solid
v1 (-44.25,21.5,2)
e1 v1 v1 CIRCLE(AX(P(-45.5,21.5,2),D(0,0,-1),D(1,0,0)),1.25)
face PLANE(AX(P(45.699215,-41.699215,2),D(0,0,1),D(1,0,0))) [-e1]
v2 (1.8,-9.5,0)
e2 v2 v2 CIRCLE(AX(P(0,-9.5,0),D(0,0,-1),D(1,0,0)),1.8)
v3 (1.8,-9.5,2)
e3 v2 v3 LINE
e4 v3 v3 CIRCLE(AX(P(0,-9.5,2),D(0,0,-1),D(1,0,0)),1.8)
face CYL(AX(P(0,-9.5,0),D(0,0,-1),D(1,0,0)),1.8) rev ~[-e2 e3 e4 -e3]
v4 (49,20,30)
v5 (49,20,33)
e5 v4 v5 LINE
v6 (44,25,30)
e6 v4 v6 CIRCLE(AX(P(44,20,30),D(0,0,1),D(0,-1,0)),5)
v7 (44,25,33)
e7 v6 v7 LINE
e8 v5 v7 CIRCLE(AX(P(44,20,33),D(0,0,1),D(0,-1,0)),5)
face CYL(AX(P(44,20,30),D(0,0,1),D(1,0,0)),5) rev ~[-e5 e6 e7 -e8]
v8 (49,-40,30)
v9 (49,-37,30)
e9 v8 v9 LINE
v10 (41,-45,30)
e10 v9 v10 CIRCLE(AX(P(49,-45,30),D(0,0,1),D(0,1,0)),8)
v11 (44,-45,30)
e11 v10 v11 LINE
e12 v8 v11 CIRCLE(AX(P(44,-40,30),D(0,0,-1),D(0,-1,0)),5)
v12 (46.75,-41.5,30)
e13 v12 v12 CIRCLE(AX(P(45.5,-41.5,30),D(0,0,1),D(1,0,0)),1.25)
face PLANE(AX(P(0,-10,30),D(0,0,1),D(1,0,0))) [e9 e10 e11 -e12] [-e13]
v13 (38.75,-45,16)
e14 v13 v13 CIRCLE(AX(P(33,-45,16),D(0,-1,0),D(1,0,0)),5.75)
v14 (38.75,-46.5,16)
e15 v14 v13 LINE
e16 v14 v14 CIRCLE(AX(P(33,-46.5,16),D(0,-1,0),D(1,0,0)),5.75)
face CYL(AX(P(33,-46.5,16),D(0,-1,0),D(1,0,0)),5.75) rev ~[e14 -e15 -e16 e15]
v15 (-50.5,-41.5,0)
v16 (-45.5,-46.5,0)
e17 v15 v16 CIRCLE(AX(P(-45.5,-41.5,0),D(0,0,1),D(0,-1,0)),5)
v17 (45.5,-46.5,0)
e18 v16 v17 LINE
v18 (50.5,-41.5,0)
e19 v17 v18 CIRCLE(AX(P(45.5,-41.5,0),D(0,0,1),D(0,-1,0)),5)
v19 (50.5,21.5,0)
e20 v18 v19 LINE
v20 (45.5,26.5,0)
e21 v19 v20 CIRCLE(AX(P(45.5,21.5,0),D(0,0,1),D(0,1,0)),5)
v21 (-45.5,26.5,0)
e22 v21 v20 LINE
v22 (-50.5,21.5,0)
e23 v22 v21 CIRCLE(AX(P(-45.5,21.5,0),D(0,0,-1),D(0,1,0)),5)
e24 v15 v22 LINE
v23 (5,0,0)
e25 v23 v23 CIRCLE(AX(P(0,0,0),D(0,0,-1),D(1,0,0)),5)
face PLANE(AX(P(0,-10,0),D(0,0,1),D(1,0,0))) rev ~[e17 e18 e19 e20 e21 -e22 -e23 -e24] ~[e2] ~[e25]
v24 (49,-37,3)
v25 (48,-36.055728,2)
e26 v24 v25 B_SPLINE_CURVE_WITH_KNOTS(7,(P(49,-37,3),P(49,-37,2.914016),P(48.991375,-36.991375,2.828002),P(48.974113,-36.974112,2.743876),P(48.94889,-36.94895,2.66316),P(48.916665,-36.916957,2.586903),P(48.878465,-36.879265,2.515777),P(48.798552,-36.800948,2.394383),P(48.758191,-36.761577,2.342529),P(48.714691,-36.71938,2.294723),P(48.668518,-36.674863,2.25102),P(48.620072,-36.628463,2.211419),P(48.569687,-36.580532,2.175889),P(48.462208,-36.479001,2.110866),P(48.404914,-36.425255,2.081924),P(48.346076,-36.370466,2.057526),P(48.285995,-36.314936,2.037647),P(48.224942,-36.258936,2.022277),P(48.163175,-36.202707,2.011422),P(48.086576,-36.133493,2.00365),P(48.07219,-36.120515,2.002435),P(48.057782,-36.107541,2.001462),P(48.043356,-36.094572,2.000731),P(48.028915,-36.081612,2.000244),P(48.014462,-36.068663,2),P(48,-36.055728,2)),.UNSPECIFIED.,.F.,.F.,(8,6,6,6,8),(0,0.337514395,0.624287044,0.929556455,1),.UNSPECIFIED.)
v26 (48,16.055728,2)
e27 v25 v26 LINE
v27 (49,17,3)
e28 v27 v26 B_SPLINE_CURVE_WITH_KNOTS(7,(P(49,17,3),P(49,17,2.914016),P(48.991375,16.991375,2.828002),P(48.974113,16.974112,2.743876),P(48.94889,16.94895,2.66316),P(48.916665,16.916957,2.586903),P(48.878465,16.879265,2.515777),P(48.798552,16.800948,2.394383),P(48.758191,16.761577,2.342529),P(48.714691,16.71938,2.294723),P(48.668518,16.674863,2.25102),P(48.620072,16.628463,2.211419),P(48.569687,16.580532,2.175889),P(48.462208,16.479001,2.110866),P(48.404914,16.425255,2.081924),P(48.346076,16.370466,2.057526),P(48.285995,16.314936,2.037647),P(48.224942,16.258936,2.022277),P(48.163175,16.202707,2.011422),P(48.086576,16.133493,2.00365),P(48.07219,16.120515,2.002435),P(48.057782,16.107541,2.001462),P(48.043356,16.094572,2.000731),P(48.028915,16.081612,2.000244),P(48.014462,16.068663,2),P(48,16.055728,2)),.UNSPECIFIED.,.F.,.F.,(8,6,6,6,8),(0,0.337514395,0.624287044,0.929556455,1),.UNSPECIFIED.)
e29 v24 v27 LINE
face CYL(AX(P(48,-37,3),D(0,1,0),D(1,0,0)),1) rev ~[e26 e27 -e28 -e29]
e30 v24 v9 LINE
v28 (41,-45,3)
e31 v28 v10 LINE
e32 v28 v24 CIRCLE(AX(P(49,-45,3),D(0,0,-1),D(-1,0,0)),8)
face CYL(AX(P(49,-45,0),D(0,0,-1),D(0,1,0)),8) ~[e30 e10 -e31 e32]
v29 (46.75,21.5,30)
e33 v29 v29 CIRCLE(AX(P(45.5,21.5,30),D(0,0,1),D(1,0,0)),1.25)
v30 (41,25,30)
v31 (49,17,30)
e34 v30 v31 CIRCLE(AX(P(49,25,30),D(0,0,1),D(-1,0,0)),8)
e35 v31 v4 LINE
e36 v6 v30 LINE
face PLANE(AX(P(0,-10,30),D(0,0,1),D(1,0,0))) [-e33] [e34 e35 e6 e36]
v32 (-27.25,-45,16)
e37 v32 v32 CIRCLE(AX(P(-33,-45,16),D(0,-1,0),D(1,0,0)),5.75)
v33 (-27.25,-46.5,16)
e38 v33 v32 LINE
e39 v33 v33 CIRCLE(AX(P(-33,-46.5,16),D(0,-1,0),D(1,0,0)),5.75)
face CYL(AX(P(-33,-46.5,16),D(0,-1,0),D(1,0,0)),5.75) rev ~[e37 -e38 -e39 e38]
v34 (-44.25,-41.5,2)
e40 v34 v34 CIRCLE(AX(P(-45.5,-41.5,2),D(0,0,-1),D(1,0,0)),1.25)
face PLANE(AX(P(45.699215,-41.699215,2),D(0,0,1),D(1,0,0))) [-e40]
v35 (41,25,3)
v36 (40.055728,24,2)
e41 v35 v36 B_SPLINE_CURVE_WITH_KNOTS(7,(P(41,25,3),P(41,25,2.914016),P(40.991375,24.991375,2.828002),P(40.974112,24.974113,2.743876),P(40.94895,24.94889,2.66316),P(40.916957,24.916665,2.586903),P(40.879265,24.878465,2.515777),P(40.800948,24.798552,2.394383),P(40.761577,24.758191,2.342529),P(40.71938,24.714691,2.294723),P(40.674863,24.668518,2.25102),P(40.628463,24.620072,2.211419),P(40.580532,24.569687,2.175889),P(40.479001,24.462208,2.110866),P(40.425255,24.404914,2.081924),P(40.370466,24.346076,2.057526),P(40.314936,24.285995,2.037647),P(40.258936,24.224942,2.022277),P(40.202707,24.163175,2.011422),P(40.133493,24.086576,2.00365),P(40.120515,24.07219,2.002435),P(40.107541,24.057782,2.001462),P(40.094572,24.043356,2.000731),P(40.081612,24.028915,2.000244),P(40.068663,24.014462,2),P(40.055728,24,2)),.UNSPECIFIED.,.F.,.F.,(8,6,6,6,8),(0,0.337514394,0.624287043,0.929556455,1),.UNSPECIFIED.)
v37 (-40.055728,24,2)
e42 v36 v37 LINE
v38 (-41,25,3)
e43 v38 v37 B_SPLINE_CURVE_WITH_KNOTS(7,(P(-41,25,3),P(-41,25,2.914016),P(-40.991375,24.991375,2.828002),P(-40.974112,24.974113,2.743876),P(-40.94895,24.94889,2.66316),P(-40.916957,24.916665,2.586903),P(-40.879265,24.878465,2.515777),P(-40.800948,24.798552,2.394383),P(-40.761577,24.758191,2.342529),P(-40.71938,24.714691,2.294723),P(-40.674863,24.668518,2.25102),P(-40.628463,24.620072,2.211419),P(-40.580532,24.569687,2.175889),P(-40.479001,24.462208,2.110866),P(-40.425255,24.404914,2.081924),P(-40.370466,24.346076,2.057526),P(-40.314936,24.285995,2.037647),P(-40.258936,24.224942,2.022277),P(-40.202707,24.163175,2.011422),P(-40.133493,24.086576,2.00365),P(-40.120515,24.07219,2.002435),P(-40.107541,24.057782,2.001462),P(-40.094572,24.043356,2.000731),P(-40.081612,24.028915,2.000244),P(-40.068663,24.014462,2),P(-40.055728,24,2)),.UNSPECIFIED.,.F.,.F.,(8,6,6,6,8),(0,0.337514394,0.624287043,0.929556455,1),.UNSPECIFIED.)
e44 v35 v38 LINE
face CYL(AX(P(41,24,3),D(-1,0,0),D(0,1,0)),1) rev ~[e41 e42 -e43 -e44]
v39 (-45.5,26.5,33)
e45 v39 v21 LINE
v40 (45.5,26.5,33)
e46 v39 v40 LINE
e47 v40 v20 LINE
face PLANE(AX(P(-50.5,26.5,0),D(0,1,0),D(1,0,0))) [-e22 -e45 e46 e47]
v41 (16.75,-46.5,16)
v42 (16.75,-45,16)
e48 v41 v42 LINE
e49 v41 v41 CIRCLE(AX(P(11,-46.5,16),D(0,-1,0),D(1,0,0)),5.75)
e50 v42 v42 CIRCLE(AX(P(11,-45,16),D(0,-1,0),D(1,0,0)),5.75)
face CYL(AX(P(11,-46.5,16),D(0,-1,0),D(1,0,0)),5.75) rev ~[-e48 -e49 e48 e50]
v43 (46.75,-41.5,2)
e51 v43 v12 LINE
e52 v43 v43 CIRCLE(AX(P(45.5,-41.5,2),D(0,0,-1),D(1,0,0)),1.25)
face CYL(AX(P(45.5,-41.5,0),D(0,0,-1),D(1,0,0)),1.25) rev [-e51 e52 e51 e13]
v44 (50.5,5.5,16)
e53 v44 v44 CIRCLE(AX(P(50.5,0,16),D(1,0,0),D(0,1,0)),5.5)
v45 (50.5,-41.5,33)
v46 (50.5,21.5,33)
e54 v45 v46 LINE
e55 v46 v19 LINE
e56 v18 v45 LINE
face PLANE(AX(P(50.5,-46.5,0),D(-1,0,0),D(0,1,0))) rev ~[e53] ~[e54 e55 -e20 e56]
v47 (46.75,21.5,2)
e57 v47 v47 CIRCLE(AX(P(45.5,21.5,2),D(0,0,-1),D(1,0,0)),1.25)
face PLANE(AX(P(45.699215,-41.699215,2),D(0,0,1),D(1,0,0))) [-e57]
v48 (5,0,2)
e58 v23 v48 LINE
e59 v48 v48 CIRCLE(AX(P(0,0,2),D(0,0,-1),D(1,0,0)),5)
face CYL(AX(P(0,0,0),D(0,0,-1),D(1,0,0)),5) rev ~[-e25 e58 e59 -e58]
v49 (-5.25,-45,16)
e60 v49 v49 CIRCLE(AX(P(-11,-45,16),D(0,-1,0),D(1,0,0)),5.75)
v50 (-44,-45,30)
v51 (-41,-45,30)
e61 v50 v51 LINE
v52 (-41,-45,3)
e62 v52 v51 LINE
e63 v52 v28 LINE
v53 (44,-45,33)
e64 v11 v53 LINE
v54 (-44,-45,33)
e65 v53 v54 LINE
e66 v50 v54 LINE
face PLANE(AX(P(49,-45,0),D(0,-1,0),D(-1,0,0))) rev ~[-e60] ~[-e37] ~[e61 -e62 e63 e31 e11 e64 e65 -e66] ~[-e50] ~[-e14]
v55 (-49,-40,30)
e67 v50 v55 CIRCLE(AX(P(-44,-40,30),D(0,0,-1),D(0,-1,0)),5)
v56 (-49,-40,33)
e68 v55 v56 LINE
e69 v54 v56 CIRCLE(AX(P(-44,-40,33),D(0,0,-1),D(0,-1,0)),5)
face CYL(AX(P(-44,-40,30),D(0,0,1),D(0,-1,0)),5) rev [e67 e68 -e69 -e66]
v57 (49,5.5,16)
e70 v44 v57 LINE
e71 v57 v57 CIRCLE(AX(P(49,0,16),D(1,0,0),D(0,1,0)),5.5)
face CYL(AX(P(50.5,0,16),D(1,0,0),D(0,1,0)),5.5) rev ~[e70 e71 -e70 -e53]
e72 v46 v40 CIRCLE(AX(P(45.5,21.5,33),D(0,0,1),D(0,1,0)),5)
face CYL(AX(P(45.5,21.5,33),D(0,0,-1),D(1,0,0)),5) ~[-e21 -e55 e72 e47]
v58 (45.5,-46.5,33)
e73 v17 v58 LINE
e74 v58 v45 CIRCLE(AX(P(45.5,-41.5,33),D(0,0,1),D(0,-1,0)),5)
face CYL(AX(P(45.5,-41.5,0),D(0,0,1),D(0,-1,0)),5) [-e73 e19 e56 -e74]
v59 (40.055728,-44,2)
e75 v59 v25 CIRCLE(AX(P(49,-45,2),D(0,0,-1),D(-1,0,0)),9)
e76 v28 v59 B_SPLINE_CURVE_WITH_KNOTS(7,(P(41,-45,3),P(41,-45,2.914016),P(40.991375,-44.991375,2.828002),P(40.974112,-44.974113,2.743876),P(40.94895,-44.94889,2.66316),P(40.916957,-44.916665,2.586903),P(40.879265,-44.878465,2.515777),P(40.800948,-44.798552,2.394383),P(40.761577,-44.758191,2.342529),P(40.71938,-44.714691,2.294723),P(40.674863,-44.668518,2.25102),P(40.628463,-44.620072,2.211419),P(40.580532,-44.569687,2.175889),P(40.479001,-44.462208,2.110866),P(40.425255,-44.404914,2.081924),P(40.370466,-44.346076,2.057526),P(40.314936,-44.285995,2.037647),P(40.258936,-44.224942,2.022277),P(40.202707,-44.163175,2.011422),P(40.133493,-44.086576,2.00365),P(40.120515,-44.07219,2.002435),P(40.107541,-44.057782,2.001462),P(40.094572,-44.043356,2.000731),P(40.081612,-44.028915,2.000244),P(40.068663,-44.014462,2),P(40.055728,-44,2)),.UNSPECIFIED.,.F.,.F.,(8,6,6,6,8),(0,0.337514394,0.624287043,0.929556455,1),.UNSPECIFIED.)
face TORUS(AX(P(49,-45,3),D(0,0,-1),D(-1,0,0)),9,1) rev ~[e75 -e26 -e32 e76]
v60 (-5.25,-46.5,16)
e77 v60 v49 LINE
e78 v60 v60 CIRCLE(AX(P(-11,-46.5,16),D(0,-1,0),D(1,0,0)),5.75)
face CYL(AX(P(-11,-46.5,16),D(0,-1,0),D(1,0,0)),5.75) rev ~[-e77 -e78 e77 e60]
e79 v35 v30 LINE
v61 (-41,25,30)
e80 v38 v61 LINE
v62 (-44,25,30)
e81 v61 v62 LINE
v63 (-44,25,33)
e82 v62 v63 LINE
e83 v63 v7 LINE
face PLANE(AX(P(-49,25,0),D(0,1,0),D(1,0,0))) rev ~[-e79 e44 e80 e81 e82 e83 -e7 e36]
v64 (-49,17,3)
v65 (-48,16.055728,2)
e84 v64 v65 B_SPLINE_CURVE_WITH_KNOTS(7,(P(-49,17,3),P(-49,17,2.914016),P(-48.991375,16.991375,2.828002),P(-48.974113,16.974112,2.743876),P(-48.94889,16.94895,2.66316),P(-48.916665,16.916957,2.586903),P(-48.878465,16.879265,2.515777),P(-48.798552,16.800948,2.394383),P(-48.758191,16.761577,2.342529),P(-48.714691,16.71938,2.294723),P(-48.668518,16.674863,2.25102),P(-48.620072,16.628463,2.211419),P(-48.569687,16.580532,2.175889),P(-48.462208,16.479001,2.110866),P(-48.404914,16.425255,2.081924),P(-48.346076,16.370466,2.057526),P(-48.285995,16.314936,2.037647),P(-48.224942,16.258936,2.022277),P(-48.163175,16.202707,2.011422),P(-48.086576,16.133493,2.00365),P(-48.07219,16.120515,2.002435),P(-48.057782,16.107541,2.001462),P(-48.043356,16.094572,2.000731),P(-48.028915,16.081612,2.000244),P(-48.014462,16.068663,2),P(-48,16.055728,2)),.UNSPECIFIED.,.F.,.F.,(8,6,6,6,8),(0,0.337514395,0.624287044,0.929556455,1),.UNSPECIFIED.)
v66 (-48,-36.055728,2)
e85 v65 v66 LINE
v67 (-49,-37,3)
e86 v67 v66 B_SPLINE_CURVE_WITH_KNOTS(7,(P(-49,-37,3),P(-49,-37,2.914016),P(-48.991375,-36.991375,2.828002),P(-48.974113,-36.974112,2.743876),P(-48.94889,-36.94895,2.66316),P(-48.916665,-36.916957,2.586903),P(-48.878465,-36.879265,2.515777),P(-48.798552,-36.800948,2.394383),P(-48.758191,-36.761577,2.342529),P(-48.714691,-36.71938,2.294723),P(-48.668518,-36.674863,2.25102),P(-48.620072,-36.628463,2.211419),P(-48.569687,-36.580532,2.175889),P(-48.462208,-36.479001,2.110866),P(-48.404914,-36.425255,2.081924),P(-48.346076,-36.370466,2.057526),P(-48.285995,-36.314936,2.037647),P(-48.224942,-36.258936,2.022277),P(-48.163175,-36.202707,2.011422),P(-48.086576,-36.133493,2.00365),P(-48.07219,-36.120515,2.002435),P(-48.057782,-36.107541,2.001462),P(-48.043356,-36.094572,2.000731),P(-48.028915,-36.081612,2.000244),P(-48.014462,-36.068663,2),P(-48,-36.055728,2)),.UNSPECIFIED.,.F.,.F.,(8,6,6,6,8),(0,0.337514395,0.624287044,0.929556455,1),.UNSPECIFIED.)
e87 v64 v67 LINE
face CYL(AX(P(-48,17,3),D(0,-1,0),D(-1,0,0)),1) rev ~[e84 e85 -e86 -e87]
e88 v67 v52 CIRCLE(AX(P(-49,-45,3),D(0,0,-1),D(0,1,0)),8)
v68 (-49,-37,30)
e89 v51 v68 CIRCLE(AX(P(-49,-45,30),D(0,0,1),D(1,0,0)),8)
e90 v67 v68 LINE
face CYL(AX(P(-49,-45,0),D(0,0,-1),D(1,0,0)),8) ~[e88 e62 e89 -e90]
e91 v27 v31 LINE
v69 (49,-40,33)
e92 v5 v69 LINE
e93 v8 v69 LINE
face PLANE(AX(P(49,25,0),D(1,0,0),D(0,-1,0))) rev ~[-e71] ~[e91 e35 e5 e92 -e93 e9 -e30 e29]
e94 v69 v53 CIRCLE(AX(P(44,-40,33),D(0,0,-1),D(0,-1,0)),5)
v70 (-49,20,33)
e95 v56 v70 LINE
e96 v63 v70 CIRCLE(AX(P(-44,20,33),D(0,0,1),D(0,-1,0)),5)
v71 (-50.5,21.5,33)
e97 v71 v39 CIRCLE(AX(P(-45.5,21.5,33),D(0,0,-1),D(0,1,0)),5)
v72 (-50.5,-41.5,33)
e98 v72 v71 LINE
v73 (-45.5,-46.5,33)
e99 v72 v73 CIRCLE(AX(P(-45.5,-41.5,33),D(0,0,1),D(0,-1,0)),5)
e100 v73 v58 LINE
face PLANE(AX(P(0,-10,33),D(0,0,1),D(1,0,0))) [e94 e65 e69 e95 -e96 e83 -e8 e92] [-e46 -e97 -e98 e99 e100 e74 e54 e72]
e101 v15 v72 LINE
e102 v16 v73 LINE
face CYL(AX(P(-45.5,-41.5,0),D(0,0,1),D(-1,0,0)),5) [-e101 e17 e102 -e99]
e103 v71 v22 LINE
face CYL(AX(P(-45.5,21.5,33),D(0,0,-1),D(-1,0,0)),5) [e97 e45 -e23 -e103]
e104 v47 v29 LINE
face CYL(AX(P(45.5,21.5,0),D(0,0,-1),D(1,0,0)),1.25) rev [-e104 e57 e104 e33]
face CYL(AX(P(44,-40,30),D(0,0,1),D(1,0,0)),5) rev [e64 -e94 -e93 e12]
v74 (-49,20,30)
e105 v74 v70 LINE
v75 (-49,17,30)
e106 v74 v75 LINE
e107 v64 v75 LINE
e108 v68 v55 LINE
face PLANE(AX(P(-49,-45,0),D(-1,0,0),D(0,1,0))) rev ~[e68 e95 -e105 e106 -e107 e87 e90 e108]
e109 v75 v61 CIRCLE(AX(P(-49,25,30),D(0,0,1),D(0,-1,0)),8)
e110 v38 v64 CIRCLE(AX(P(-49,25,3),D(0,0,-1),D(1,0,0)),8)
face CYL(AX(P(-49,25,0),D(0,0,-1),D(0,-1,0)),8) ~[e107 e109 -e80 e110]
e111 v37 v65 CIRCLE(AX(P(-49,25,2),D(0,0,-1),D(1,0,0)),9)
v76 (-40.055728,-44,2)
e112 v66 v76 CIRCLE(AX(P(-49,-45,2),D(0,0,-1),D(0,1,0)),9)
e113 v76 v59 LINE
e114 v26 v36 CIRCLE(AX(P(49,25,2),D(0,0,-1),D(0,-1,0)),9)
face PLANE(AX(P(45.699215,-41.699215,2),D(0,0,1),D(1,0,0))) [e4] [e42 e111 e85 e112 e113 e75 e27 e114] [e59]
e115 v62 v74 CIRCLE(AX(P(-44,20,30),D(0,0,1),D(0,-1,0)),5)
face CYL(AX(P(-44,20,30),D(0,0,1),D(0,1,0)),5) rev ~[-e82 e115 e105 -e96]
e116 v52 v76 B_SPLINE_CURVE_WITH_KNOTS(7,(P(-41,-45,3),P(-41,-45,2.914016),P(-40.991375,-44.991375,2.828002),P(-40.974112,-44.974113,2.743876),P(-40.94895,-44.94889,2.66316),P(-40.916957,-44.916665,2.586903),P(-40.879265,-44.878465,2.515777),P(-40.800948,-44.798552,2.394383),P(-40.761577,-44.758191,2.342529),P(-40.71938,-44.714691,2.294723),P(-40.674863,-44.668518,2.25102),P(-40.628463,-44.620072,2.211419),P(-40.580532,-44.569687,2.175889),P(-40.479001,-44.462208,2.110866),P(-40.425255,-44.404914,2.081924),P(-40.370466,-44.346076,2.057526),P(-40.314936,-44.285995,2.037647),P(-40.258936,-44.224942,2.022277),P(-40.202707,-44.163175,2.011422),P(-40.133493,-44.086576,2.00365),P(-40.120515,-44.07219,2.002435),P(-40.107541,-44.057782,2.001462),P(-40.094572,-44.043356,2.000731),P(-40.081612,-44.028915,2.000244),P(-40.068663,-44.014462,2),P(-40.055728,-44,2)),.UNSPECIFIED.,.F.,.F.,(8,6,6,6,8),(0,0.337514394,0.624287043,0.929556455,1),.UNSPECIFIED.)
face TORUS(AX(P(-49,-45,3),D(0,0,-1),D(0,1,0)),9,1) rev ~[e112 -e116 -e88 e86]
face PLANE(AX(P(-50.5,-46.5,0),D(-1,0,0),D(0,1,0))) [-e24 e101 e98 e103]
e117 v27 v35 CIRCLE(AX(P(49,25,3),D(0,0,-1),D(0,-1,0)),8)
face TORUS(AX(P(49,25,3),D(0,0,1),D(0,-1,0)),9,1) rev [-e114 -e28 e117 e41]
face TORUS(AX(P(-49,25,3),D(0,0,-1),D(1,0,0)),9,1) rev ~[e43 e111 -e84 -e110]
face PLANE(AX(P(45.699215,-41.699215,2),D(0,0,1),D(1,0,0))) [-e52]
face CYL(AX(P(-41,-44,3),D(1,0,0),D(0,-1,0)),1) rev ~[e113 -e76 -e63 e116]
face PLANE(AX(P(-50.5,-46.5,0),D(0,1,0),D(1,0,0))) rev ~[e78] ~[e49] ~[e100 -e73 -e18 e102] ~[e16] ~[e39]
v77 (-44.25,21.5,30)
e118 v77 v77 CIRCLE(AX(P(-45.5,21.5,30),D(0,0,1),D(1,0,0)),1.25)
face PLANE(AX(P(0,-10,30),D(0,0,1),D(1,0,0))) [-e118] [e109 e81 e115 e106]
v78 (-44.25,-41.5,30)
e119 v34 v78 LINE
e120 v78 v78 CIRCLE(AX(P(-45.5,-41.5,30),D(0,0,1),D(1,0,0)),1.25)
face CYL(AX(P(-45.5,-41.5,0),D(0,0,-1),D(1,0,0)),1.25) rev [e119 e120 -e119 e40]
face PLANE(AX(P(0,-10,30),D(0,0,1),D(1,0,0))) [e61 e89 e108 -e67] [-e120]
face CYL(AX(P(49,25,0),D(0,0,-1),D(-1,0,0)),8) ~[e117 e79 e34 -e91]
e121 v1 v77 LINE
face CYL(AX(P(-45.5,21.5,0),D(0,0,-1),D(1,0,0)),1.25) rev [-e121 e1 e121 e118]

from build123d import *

# Parameters (mm, degrees)
F0_R      = 1.25
F1_DEPTH  = 2
F0_W      = 101
F0_H      = 73
F2_DEPTH  = 30
F3_DEPTH  = 33
F4_R      = 5.5
F5_DEPTH  = 2
F6_R      = 5.75
F7_DEPTH  = 2
F8_R      = 1
F9_R      = 5
F10_R     = 5
F10_R_2   = 1.8
F11_DEPTH = 5


# Not quite as in the source:
# - a feature names something its author has since deleted; it is built from what else it names


with BuildPart() as f1:
    # F0 (on Top) → F1 (new body)
    with BuildSketch(Plane.XY):
        with BuildLine():
            Line((41, -45), (49, -45))
            Line((49, -45), (49, -37))
            ThreePointArc((49, -37), (43.3431457505, -39.3431457505), (41, -45))
        make_face()
        with Locations((45.5, -41.5)):
            Circle(F0_R, mode=Mode.SUBTRACT)
        with BuildLine():
            Line((-41, -45), (41, -45))
            ThreePointArc((41, -45), (43.3431457505, -39.3431457505), (49, -37))
            Line((49, -37), (49, 17))
            ThreePointArc((49, 17), (43.3431457505, 19.3431457505), (41, 25))
            Line((41, 25), (-41, 25))
            ThreePointArc((-41, 25), (-43.3431457505, 19.3431457505), (-49, 17))
            Line((-49, 17), (-49, -37))
            ThreePointArc((-49, -37), (-43.3431457505, -39.3431457505), (-41, -45))
        make_face()
        with BuildLine():
            Line((-49, -45), (-41, -45))
            ThreePointArc((-41, -45), (-43.3431457505, -39.3431457505), (-49, -37))
            Line((-49, -37), (-49, -45))
        make_face()
        with Locations((-45.5, -41.5)):
            Circle(F0_R, mode=Mode.SUBTRACT)
        with BuildLine():
            Line((-49, 25), (-49, 17))
            ThreePointArc((-49, 17), (-43.3431457505, 19.3431457505), (-41, 25))
            Line((-41, 25), (-49, 25))
        make_face()
        with Locations((-45.5, 21.5)):
            Circle(F0_R, mode=Mode.SUBTRACT)
        with Locations((-45.5, 21.5)):
            Circle(F0_R)
        with BuildLine():
            ThreePointArc((41, 25), (43.3431457505, 19.3431457505), (49, 17))
            Line((49, 17), (49, 25))
            Line((49, 25), (41, 25))
        make_face()
        with Locations((45.5, 21.5)):
            Circle(F0_R, mode=Mode.SUBTRACT)
        with Locations((45.5, 21.5)):
            Circle(F0_R)
        with Locations((45.5, -41.5)):
            Circle(F0_R)
        with Locations((-45.5, -41.5)):
            Circle(F0_R)
    extrude(amount=F1_DEPTH)

    # F0 (on Top) → F2 (join)
    with BuildSketch(Plane.XY):
        with Locations((0, -10)):
            Rectangle(F0_W, F0_H)
        Polygon((49, -37), (49, -45), (41, -45), (-41, -45), (-49, -45), (-49, -37), (-49, 17), (-49, 25), (-41, 25), (41, 25), (49, 25), (49, 17), align=None, mode=Mode.SUBTRACT)
        with BuildLine():
            Line((-49, -45), (-41, -45))
            ThreePointArc((-41, -45), (-43.3431457505, -39.3431457505), (-49, -37))
            Line((-49, -37), (-49, -45))
        make_face()
        with Locations((-45.5, -41.5)):
            Circle(F0_R, mode=Mode.SUBTRACT)
        with BuildLine():
            Line((41, -45), (49, -45))
            Line((49, -45), (49, -37))
            ThreePointArc((49, -37), (43.3431457505, -39.3431457505), (41, -45))
        make_face()
        with Locations((45.5, -41.5)):
            Circle(F0_R, mode=Mode.SUBTRACT)
        with BuildLine():
            ThreePointArc((41, 25), (43.3431457505, 19.3431457505), (49, 17))
            Line((49, 17), (49, 25))
            Line((49, 25), (41, 25))
        make_face()
        with Locations((45.5, 21.5)):
            Circle(F0_R, mode=Mode.SUBTRACT)
        with BuildLine():
            Line((-49, 25), (-49, 17))
            ThreePointArc((-49, 17), (-43.3431457505, 19.3431457505), (-41, 25))
            Line((-41, 25), (-49, 25))
        make_face()
        with Locations((-45.5, 21.5)):
            Circle(F0_R, mode=Mode.SUBTRACT)
    extrude(amount=F2_DEPTH)

    # F0 (on Top) → F3 (join)
    with BuildSketch(Plane.XY):
        with Locations((0, -10)):
            Rectangle(F0_W, F0_H)
        Polygon((49, -37), (49, -45), (41, -45), (-41, -45), (-49, -45), (-49, -37), (-49, 17), (-49, 25), (-41, 25), (41, 25), (49, 25), (49, 17), align=None, mode=Mode.SUBTRACT)
    extrude(amount=F3_DEPTH)

    # F4 (on face) → F5 (cut)
    with BuildSketch(Plane.YZ.offset(50.5)):
        with Locations((0, 16)):
            Circle(F4_R)
    extrude(amount=-F5_DEPTH, mode=Mode.SUBTRACT)

    # F6 (on face) → F7 (cut)
    with BuildSketch(Plane.XZ.offset(46.5)):
        with Locations((-33, 16)):
            Circle(F6_R)
        with Locations((-11, 16)):
            Circle(F6_R)
        with Locations((11, 16)):
            Circle(F6_R)
        with Locations((33, 16)):
            Circle(F6_R)
    extrude(amount=-F7_DEPTH, mode=Mode.SUBTRACT)

    # F8
    f8_edges = [f1.edges().sort_by_distance(p)[0] for p in [
        (0, -45, 2),
        (-49, -10, 2),
        (0, 25, 2),
        (49, -10, 2),
        (43.343146, -39.343146, 2),
        (43.343146, 19.343146, 2),
        (-43.343146, 19.343146, 2),
        (-43.343146, -39.343146, 2),
    ]]
    fillet(f8_edges, radius=F8_R)

    # F9
    f9_edges = [f1.edges().sort_by_distance(p)[0] for p in [
        (-50.5, 26.5, 16.5),
        (50.5, 26.5, 16.5),
        (50.5, -46.5, 16.5),
        (-50.5, -46.5, 16.5),
        (49, -45, 31.5),
        (49, 25, 31.5),
        (-49, 25, 31.5),
        (-49, -45, 31.5),
    ]]
    fillet(f9_edges, radius=F9_R)

    # F10 (on face) → F11 (cut)
    with BuildSketch(Plane(origin=(0, 0, 0), x_dir=(1, 0, 0), z_dir=(0, 0, -1))):
        Circle(F10_R)
        with Locations((0, 9.5)):
            Circle(F10_R_2)
    extrude(amount=-F11_DEPTH, mode=Mode.SUBTRACT)


solid = f1.part
